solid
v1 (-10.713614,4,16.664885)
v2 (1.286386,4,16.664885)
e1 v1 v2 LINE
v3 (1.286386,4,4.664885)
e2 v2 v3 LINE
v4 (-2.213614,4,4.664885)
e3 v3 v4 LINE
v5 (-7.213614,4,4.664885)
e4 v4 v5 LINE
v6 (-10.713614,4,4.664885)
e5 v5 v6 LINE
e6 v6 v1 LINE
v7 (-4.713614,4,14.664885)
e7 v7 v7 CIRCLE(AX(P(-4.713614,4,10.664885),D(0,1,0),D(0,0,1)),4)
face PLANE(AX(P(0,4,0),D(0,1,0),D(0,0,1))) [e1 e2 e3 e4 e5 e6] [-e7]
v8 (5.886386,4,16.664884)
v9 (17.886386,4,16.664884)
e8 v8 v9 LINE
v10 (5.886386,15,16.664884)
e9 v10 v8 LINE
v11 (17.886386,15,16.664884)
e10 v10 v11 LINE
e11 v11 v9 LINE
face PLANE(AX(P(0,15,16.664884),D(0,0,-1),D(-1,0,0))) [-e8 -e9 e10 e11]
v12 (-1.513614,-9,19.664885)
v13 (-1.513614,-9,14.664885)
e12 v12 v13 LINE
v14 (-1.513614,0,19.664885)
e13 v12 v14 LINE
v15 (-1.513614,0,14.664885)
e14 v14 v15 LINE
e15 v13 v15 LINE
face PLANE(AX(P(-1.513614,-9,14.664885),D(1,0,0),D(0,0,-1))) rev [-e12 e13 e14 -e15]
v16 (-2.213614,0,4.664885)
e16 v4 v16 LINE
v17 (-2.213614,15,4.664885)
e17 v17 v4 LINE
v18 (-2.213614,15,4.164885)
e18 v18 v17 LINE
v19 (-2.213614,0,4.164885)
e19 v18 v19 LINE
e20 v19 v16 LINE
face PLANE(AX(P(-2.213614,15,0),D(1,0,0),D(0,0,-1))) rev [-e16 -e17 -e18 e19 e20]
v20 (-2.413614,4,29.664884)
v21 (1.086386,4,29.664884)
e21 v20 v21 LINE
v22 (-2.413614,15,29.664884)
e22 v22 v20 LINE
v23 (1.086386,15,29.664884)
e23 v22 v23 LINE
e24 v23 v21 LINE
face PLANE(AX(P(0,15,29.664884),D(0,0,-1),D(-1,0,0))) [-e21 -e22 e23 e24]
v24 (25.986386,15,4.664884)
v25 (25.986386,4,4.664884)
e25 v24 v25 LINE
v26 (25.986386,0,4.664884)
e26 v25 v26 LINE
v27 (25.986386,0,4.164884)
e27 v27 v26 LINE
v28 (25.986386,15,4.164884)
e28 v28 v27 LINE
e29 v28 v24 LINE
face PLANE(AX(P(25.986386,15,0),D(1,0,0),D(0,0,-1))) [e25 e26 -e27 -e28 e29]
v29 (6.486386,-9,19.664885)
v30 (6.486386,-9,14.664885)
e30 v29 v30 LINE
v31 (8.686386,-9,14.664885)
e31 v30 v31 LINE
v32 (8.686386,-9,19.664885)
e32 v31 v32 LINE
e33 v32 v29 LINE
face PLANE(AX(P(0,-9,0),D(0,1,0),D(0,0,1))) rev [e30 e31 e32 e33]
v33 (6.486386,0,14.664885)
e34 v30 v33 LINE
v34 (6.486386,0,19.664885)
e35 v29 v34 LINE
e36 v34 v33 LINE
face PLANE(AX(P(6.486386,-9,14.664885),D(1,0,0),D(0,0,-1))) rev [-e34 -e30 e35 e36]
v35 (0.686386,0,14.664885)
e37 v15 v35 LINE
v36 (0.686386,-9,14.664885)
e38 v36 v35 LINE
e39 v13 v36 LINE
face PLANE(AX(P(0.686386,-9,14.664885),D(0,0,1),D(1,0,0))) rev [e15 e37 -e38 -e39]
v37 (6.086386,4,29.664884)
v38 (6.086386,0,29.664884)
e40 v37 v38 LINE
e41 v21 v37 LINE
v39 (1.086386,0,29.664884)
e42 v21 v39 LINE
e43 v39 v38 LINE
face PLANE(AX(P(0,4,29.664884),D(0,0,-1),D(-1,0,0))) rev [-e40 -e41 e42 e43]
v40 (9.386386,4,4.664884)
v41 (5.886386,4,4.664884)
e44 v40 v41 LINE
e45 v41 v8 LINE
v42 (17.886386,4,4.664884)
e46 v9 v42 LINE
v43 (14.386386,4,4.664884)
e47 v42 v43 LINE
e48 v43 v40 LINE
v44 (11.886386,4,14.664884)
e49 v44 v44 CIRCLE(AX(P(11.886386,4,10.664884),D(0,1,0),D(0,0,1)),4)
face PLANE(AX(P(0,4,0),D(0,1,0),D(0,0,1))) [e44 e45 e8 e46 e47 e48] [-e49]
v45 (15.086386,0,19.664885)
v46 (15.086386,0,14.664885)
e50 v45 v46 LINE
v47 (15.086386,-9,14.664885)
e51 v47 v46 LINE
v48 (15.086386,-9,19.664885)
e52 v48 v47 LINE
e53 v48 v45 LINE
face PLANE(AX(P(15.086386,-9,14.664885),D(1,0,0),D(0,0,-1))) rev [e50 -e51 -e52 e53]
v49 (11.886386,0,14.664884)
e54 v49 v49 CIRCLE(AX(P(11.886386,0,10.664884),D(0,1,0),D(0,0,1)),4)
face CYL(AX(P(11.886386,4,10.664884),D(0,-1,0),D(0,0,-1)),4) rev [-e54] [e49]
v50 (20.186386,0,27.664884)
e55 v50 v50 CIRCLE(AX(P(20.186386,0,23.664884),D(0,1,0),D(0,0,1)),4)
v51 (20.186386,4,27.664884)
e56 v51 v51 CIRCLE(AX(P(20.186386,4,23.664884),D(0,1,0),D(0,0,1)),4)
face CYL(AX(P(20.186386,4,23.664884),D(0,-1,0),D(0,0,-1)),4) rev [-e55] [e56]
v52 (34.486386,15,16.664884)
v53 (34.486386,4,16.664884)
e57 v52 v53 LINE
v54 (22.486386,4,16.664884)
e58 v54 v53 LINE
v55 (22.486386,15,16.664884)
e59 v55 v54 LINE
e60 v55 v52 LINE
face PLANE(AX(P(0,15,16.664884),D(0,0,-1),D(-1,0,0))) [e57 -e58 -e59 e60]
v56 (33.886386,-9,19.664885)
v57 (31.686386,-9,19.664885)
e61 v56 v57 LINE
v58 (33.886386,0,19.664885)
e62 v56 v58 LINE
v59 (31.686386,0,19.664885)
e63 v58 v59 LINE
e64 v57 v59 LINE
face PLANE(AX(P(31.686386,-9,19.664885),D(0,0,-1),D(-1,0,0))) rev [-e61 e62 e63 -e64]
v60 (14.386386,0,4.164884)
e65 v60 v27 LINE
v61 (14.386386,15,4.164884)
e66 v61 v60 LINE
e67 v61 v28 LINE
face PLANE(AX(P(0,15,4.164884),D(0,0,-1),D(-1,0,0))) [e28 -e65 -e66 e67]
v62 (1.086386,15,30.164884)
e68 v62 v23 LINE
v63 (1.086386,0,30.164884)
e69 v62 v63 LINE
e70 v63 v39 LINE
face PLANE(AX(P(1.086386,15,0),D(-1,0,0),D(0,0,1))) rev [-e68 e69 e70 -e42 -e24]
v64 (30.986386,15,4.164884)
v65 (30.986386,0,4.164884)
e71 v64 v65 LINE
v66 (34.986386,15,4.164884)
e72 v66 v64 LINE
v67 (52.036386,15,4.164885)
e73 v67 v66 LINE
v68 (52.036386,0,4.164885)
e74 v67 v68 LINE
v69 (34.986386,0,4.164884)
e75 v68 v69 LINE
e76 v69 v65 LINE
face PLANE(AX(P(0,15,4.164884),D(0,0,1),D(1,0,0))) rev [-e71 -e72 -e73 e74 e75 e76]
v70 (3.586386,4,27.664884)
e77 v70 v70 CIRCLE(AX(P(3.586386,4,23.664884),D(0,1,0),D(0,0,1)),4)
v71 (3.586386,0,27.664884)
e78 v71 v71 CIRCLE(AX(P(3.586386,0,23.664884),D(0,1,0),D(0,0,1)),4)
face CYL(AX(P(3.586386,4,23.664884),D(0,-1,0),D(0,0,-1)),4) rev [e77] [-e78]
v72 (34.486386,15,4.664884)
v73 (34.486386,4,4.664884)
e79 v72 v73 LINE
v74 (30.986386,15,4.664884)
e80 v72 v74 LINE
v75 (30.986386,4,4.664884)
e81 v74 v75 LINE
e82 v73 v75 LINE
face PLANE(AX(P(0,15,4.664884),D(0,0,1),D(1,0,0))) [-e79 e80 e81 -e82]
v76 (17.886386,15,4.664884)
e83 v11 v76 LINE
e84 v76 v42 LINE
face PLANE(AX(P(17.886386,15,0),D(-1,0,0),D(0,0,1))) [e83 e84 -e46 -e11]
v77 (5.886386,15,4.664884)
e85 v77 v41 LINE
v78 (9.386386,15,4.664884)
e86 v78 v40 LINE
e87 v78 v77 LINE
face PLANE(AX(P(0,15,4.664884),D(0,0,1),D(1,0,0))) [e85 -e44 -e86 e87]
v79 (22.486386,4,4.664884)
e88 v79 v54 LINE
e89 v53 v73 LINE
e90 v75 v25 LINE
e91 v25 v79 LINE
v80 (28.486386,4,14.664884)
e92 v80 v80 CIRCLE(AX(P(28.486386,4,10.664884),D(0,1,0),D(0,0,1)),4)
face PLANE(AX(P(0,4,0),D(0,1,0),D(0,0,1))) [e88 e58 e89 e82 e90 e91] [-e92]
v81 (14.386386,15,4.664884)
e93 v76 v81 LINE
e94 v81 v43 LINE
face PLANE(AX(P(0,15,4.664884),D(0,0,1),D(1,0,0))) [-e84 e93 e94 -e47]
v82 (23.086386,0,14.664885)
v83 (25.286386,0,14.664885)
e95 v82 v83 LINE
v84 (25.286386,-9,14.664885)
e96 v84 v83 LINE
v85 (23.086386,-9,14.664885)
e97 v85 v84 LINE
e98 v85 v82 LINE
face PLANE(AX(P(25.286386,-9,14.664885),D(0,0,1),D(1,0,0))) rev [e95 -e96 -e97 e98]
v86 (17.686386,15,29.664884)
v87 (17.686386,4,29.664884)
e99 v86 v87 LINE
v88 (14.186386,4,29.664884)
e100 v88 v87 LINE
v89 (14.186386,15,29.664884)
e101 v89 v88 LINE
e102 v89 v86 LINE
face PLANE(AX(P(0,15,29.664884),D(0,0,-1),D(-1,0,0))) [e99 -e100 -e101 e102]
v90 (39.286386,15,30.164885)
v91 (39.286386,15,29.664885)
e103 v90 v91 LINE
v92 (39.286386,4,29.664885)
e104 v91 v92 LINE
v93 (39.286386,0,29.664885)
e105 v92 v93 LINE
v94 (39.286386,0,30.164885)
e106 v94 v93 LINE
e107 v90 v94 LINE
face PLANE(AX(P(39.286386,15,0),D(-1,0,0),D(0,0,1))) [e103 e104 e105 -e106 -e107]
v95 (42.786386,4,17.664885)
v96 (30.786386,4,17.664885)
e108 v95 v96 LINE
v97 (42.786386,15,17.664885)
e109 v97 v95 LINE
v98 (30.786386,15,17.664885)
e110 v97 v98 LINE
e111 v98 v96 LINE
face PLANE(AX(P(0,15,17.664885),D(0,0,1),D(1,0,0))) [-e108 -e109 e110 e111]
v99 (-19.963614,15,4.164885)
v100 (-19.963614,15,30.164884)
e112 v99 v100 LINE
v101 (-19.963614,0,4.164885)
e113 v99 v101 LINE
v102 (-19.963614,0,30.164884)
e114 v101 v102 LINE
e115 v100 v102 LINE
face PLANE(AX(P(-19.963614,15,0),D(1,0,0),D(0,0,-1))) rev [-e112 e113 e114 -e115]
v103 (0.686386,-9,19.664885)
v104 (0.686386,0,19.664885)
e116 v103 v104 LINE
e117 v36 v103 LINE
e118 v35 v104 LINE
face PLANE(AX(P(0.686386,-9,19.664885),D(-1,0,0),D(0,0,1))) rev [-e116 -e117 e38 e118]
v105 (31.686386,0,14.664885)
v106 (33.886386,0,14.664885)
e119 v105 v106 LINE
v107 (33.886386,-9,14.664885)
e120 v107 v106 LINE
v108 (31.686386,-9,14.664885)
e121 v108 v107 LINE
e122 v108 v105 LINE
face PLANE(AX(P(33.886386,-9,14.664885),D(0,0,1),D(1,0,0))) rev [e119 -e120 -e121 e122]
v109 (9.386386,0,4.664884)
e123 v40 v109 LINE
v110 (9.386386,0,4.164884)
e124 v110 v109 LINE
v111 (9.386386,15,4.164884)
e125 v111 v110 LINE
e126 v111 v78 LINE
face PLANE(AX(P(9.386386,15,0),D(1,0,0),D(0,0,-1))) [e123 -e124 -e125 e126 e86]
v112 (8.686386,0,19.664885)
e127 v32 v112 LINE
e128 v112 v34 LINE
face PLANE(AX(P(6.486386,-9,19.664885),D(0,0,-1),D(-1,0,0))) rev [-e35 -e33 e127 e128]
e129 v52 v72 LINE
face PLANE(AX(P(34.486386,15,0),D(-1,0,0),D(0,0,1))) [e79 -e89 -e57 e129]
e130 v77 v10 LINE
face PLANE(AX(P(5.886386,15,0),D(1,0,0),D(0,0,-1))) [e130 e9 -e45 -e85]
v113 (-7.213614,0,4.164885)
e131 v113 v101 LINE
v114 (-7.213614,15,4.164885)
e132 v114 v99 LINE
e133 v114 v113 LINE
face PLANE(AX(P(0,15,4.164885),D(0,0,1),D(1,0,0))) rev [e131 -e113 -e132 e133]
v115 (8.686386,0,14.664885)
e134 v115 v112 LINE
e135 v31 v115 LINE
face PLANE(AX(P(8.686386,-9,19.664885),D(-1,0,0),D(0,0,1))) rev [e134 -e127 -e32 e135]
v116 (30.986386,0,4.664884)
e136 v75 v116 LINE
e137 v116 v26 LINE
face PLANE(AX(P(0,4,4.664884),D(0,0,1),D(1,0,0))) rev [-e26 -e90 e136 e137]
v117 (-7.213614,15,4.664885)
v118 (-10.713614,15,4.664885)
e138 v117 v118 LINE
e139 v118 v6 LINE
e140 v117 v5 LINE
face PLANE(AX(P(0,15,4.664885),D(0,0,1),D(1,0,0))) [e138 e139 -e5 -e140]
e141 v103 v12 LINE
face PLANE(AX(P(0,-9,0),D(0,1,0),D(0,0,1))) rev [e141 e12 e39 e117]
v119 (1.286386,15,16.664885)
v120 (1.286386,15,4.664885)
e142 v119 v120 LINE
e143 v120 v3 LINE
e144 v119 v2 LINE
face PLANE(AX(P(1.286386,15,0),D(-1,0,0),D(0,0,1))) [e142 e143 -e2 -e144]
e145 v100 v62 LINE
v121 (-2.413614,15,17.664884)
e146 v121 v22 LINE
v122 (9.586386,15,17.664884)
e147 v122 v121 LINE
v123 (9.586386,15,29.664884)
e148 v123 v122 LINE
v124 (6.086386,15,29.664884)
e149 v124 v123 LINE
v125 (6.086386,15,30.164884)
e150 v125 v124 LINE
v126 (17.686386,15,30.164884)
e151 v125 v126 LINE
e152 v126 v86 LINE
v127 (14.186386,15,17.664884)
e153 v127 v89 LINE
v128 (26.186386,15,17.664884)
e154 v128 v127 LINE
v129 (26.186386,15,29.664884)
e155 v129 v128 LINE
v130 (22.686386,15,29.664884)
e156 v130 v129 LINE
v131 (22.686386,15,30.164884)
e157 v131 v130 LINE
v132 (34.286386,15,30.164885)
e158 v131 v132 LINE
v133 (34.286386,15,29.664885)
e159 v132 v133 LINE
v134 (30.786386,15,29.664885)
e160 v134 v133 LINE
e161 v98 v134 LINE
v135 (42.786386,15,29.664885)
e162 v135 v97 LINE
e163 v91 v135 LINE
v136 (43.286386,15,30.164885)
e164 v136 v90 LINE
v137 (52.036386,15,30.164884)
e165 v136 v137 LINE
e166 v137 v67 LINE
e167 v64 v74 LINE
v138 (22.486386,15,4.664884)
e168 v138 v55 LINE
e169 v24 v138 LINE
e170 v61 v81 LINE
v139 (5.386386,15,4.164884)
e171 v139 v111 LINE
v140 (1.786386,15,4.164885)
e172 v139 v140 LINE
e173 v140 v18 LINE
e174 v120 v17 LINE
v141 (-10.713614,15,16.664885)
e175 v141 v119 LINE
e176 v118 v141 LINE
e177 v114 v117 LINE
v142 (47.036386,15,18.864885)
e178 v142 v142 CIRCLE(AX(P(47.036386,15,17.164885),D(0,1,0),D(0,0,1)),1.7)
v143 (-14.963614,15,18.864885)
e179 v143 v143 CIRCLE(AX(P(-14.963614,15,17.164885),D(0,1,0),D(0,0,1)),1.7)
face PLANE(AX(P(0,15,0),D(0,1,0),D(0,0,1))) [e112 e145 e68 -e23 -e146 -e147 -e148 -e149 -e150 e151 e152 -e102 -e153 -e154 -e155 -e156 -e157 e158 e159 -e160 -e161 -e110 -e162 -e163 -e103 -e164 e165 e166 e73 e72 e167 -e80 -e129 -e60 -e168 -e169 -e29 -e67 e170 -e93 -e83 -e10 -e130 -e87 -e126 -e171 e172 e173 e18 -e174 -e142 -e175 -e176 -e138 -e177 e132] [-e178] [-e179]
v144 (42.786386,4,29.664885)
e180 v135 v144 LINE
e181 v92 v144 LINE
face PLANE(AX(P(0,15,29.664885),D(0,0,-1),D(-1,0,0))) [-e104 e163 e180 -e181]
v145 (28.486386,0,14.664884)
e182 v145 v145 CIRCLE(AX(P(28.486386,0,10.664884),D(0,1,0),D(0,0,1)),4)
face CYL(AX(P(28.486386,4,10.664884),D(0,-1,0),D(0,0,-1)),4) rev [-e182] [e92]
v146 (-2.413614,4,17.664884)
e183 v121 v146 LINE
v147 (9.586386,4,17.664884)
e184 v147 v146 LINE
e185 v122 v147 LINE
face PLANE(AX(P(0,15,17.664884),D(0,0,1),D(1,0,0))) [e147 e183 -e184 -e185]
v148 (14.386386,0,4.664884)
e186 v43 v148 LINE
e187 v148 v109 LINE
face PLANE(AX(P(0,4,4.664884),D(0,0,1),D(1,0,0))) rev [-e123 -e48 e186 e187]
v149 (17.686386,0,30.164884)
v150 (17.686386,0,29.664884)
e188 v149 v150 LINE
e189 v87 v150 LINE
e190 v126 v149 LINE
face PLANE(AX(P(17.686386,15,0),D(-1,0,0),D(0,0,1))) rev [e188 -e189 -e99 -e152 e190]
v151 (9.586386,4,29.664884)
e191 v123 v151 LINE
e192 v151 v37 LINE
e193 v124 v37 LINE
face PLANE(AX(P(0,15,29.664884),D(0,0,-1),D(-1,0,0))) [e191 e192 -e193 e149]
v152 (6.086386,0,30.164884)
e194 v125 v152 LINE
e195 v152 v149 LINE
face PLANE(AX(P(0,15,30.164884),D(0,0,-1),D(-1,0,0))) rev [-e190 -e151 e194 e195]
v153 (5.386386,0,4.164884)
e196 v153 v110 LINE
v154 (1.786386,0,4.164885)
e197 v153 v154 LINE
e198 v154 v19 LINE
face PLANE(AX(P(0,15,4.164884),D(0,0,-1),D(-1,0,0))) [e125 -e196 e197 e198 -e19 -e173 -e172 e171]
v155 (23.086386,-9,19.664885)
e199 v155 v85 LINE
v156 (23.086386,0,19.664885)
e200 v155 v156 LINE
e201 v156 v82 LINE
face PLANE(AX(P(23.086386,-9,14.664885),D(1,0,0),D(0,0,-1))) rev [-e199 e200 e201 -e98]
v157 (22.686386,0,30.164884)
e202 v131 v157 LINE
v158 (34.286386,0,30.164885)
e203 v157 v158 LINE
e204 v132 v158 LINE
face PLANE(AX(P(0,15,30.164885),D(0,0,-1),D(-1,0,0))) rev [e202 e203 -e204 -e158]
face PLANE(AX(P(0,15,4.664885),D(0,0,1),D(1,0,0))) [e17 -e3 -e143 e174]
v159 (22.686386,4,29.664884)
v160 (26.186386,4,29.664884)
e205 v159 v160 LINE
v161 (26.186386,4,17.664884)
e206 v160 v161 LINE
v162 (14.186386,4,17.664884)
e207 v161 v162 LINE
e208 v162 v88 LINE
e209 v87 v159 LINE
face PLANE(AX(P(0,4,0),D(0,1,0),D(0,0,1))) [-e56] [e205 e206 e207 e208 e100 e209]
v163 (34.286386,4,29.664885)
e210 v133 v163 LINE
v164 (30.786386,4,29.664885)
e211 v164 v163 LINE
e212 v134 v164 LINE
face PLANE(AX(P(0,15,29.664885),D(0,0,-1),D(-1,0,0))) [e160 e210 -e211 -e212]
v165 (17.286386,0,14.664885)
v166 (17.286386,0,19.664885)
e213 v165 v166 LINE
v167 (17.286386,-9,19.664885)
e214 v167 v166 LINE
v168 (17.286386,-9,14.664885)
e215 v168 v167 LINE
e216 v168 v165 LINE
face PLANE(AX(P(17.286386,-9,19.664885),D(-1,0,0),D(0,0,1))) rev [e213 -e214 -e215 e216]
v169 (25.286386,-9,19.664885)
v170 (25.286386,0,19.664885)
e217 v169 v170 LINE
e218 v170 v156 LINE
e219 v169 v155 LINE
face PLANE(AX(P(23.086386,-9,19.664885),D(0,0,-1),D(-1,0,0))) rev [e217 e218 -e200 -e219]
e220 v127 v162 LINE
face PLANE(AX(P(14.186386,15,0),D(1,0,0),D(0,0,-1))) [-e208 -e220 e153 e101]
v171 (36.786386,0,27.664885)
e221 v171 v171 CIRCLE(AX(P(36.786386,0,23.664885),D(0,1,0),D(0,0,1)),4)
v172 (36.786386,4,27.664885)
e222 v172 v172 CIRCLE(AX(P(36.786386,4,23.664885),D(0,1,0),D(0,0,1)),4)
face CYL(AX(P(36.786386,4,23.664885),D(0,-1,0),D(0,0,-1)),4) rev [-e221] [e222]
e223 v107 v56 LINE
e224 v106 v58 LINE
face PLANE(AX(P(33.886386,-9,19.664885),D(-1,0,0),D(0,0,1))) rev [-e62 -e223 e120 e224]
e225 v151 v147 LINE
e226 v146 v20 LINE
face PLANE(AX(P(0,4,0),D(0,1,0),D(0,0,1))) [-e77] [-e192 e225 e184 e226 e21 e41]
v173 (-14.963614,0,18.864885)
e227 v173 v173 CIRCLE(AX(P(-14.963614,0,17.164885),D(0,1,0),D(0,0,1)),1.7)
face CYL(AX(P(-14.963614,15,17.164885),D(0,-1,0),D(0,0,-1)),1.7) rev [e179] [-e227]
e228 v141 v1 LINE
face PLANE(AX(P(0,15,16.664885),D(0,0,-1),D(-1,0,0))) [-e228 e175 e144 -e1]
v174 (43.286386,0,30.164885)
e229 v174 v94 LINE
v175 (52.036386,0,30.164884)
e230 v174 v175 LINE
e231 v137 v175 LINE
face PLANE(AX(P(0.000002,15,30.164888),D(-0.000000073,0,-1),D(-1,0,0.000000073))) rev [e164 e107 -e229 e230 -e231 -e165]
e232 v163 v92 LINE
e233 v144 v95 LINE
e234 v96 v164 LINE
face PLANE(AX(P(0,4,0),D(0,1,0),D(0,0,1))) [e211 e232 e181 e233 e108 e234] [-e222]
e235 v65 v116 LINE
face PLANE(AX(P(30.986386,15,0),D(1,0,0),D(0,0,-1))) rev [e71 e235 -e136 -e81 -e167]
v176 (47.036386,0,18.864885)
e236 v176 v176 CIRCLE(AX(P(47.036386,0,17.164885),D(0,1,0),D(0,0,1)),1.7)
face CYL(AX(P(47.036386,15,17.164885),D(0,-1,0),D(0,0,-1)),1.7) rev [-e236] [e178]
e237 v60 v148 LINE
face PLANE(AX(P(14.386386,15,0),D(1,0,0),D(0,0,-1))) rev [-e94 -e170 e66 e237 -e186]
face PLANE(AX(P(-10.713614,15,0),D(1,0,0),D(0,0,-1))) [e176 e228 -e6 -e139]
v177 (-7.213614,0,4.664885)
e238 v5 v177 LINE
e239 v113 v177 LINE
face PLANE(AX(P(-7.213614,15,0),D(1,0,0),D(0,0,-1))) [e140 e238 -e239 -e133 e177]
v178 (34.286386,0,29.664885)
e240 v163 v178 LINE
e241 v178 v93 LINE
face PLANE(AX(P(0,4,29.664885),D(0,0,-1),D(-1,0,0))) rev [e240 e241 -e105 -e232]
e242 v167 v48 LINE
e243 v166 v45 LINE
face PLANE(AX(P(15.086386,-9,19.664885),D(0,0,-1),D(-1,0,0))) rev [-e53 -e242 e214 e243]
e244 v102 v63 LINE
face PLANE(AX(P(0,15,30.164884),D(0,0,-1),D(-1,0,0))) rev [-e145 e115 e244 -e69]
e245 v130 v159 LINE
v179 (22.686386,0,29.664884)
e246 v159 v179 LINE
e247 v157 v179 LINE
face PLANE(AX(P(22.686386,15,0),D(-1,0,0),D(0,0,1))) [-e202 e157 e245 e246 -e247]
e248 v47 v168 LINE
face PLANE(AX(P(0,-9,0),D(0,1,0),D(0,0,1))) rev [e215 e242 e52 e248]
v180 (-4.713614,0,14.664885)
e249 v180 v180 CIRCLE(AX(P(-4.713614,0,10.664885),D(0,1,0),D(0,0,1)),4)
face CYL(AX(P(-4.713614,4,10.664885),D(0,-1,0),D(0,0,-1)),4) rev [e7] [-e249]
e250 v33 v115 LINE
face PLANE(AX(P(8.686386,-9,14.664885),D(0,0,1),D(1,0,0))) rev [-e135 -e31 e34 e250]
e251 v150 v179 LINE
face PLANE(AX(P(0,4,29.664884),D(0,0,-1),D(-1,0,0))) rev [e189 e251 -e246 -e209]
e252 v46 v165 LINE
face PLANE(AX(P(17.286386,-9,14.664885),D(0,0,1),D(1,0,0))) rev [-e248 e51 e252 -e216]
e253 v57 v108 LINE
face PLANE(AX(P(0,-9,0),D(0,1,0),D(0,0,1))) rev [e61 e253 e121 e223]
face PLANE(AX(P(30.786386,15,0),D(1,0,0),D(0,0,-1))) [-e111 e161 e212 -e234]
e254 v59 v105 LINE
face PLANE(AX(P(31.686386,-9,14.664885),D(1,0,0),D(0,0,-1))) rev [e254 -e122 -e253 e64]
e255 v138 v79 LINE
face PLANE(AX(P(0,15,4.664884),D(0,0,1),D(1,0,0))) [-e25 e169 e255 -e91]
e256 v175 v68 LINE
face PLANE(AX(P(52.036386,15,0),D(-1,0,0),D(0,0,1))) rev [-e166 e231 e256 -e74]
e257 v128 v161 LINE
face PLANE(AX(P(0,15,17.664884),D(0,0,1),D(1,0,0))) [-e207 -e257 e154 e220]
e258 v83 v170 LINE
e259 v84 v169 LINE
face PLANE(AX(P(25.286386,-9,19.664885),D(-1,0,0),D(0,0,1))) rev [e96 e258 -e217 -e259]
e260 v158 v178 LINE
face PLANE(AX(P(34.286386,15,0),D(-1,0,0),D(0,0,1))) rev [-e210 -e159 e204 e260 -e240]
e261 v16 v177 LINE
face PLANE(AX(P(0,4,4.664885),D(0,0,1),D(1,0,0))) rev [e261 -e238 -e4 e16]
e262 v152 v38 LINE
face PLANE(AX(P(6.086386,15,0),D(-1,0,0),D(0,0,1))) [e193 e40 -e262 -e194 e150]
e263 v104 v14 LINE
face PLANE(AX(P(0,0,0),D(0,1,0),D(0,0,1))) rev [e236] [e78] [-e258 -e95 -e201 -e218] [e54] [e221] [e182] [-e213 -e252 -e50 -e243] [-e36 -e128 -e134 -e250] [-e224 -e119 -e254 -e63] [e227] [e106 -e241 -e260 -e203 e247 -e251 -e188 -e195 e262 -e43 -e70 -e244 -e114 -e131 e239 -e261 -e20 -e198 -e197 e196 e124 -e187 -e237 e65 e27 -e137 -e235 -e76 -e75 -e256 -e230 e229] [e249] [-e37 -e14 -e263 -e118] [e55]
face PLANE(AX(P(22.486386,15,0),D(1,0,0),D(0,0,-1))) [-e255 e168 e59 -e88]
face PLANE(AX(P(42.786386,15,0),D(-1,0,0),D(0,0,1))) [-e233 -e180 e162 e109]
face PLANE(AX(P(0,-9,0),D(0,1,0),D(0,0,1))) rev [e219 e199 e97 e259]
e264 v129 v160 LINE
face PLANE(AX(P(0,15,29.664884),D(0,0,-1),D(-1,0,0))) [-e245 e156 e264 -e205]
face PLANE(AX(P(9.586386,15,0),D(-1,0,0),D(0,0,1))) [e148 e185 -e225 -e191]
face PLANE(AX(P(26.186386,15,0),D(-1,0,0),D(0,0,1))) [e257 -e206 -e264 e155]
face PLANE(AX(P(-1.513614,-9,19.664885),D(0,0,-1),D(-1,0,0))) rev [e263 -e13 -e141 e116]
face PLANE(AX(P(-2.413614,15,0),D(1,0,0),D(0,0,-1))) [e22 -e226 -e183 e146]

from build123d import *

# Parameters (mm, degrees)
SKETCH1_W             = 12
SKETCH1_H             = 12
SKETCH1_R             = 4
BOSS_EXTRUDE1_DEPTH   = 4
BOSS_EXTRUDE1_2_DEPTH = 4
BOSS_EXTRUDE1_3_DEPTH = 4
BOSS_EXTRUDE1_4_DEPTH = 4
BOSS_EXTRUDE1_5_DEPTH = 4
BOSS_EXTRUDE1_6_DEPTH = 4
SKETCH1_3_R           = 1.7
BOSS_EXTRUDE2_DEPTH   = 15
SKETCH2_W             = 2.2
SKETCH2_H             = 5.00000001
SKETCH2_H_2           = 5.000000011
BOSS_EXTRUDE3_DEPTH   = 9


with BuildPart() as part:
    # Sketch1 → Boss-Extrude1 (new body)
    with BuildSketch(Plane(origin=(0, 0, 0), x_dir=(1, 0, 0), z_dir=(0, 1, 0))):
        with Locations((11.886385948, -10.664884408)):
            Rectangle(SKETCH1_W, SKETCH1_H)
        with Locations((11.886385948, -10.664884408)):
            Circle(SKETCH1_R, mode=Mode.SUBTRACT)
    extrude(amount=BOSS_EXTRUDE1_DEPTH)



with BuildPart() as body_2:
    # Sketch1 → Boss-Extrude1 2 (new body)
    with BuildSketch(Plane(origin=(0, 0, 0), x_dir=(1, 0, 0), z_dir=(0, 1, 0))):
        with Locations((-4.713614052, -10.664885052)):
            Rectangle(SKETCH1_W, SKETCH1_H)
        with Locations((-4.713614052, -10.664885052)):
            Circle(SKETCH1_R, mode=Mode.SUBTRACT)
    extrude(amount=BOSS_EXTRUDE1_2_DEPTH)


with BuildPart() as body_3:
    # Sketch1 → Boss-Extrude1 3 (new body)
    with BuildSketch(Plane(origin=(0, 0, 0), x_dir=(1, 0, 0), z_dir=(0, 1, 0))):
        with Locations((3.586385956, -23.664883973)):
            Rectangle(SKETCH1_W, SKETCH1_H)
        with Locations((3.586385956, -23.664883973)):
            Circle(SKETCH1_R, mode=Mode.SUBTRACT)
    extrude(amount=BOSS_EXTRUDE1_3_DEPTH)


with BuildPart() as body_4:
    # Sketch1 → Boss-Extrude1 4 (new body)
    with BuildSketch(Plane(origin=(0, 0, 0), x_dir=(1, 0, 0), z_dir=(0, 1, 0))):
        with Locations((20.186385956, -23.664884408)):
            Rectangle(SKETCH1_W, SKETCH1_H)
        with Locations((20.186385956, -23.664884408)):
            Circle(SKETCH1_R, mode=Mode.SUBTRACT)
    extrude(amount=BOSS_EXTRUDE1_4_DEPTH)


with BuildPart() as body_5:
    # Sketch1 → Boss-Extrude1 5 (new body)
    with BuildSketch(Plane(origin=(0, 0, 0), x_dir=(1, 0, 0), z_dir=(0, 1, 0))):
        with Locations((28.486385948, -10.664884408)):
            Rectangle(SKETCH1_W, SKETCH1_H)
        with Locations((28.486385948, -10.664884408)):
            Circle(SKETCH1_R, mode=Mode.SUBTRACT)
    extrude(amount=BOSS_EXTRUDE1_5_DEPTH)


with BuildPart() as body_6:
    # Sketch1 → Boss-Extrude1 6 (new body)
    with BuildSketch(Plane(origin=(0, 0, 0), x_dir=(1, 0, 0), z_dir=(0, 1, 0))):
        with Locations((36.786385956, -23.66488461)):
            Rectangle(SKETCH1_W, SKETCH1_H)
        with Locations((36.786385956, -23.66488461)):
            Circle(SKETCH1_R, mode=Mode.SUBTRACT)
    extrude(amount=BOSS_EXTRUDE1_6_DEPTH)


with BuildPart() as part_1:
    add(part.part)

    add(body_2.part)  # Boss-Extrude2 merges body 2

    add(body_3.part)  # Boss-Extrude2 merges body 3

    add(body_4.part)  # Boss-Extrude2 merges body 4

    add(body_5.part)  # Boss-Extrude2 merges body 5

    add(body_6.part)  # Boss-Extrude2 merges body 6
    # Sketch1<3> → Boss-Extrude2 (add)
    with BuildSketch(Plane(origin=(0, 0, 0), x_dir=(1, 0, 0), z_dir=(0, 1, 0))):
        Polygon((5.386385948, -4.164884408), (1.786385948, -4.164885052), (-2.213614052, -4.164885052), (-2.213614052, -4.664885052), (1.286385948, -4.664885052), (1.286385948, -16.664885052), (-10.713614052, -16.664885052), (-10.713614052, -4.664885052), (-7.213614052, -4.664885052), (-7.213614052, -4.164885052), (-19.963614052, -4.164885052), (-19.963614052, -30.164883973), (1.086385956, -30.164883973), (1.086385956, -29.664883973), (-2.413614044, -29.664883973), (-2.413614044, -17.664883973), (9.586385956, -17.664883973), (9.586385956, -29.664883973), (6.086385956, -29.664883973), (6.086385956, -30.164883973), (10.086385956, -30.164883973), (13.686385956, -30.164884408), (17.686385956, -30.164884408), (17.686385956, -29.664884408), (14.186385956, -29.664884408), (14.186385956, -17.664884408), (26.186385956, -17.664884408), (26.186385956, -29.664884408), (22.686385956, -29.664884408), (22.686385956, -30.164884408), (26.686385956, -30.164884408), (30.286385956, -30.16488461), (34.286385956, -30.16488461), (34.286385956, -29.66488461), (30.786385956, -29.66488461), (30.786385956, -17.66488461), (42.786385956, -17.66488461), (42.786385956, -29.66488461), (39.286385956, -29.66488461), (39.286385956, -30.16488461), (43.286385956, -30.16488461), (52.036385956, -30.164883973), (52.036385956, -4.164885052), (34.986385948, -4.164884408), (30.986385948, -4.164884408), (30.986385948, -4.664884408), (34.486385948, -4.664884408), (34.486385948, -16.664884408), (22.486385948, -16.664884408), (22.486385948, -4.664884408), (25.986385948, -4.664884408), (25.986385948, -4.164884408), (14.386385948, -4.164884408), (14.386385948, -4.664884408), (17.886385948, -4.664884408), (17.886385948, -16.664884408), (5.886385948, -16.664884408), (5.886385948, -4.664884408), (9.386385948, -4.664884408), (9.386385948, -4.164884408), align=None)
        with Locations((-14.963614052, -17.164884513)):
            Circle(SKETCH1_3_R, mode=Mode.SUBTRACT)
        with Locations((47.036385956, -17.164884513)):
            Circle(SKETCH1_3_R, mode=Mode.SUBTRACT)
    extrude(amount=BOSS_EXTRUDE2_DEPTH)

    # Sketch2 → Boss-Extrude3 (add)
    with BuildSketch(Plane.XZ):
        with Locations((-0.413614044, 17.164884518)):
            Rectangle(SKETCH2_W, SKETCH2_H)
        with Locations((7.586385956, 17.164884518)):
            Rectangle(SKETCH2_W, SKETCH2_H)
        with Locations((16.186385956, 17.164884518)):
            Rectangle(SKETCH2_W, SKETCH2_H)
        with Locations((24.186385956, 17.164884518)):
            Rectangle(SKETCH2_W, SKETCH2_H)
        with Locations((32.786385956, 17.164884508)):
            Rectangle(SKETCH2_W, SKETCH2_H_2)
    extrude(amount=BOSS_EXTRUDE3_DEPTH)


solid = part_1.part
